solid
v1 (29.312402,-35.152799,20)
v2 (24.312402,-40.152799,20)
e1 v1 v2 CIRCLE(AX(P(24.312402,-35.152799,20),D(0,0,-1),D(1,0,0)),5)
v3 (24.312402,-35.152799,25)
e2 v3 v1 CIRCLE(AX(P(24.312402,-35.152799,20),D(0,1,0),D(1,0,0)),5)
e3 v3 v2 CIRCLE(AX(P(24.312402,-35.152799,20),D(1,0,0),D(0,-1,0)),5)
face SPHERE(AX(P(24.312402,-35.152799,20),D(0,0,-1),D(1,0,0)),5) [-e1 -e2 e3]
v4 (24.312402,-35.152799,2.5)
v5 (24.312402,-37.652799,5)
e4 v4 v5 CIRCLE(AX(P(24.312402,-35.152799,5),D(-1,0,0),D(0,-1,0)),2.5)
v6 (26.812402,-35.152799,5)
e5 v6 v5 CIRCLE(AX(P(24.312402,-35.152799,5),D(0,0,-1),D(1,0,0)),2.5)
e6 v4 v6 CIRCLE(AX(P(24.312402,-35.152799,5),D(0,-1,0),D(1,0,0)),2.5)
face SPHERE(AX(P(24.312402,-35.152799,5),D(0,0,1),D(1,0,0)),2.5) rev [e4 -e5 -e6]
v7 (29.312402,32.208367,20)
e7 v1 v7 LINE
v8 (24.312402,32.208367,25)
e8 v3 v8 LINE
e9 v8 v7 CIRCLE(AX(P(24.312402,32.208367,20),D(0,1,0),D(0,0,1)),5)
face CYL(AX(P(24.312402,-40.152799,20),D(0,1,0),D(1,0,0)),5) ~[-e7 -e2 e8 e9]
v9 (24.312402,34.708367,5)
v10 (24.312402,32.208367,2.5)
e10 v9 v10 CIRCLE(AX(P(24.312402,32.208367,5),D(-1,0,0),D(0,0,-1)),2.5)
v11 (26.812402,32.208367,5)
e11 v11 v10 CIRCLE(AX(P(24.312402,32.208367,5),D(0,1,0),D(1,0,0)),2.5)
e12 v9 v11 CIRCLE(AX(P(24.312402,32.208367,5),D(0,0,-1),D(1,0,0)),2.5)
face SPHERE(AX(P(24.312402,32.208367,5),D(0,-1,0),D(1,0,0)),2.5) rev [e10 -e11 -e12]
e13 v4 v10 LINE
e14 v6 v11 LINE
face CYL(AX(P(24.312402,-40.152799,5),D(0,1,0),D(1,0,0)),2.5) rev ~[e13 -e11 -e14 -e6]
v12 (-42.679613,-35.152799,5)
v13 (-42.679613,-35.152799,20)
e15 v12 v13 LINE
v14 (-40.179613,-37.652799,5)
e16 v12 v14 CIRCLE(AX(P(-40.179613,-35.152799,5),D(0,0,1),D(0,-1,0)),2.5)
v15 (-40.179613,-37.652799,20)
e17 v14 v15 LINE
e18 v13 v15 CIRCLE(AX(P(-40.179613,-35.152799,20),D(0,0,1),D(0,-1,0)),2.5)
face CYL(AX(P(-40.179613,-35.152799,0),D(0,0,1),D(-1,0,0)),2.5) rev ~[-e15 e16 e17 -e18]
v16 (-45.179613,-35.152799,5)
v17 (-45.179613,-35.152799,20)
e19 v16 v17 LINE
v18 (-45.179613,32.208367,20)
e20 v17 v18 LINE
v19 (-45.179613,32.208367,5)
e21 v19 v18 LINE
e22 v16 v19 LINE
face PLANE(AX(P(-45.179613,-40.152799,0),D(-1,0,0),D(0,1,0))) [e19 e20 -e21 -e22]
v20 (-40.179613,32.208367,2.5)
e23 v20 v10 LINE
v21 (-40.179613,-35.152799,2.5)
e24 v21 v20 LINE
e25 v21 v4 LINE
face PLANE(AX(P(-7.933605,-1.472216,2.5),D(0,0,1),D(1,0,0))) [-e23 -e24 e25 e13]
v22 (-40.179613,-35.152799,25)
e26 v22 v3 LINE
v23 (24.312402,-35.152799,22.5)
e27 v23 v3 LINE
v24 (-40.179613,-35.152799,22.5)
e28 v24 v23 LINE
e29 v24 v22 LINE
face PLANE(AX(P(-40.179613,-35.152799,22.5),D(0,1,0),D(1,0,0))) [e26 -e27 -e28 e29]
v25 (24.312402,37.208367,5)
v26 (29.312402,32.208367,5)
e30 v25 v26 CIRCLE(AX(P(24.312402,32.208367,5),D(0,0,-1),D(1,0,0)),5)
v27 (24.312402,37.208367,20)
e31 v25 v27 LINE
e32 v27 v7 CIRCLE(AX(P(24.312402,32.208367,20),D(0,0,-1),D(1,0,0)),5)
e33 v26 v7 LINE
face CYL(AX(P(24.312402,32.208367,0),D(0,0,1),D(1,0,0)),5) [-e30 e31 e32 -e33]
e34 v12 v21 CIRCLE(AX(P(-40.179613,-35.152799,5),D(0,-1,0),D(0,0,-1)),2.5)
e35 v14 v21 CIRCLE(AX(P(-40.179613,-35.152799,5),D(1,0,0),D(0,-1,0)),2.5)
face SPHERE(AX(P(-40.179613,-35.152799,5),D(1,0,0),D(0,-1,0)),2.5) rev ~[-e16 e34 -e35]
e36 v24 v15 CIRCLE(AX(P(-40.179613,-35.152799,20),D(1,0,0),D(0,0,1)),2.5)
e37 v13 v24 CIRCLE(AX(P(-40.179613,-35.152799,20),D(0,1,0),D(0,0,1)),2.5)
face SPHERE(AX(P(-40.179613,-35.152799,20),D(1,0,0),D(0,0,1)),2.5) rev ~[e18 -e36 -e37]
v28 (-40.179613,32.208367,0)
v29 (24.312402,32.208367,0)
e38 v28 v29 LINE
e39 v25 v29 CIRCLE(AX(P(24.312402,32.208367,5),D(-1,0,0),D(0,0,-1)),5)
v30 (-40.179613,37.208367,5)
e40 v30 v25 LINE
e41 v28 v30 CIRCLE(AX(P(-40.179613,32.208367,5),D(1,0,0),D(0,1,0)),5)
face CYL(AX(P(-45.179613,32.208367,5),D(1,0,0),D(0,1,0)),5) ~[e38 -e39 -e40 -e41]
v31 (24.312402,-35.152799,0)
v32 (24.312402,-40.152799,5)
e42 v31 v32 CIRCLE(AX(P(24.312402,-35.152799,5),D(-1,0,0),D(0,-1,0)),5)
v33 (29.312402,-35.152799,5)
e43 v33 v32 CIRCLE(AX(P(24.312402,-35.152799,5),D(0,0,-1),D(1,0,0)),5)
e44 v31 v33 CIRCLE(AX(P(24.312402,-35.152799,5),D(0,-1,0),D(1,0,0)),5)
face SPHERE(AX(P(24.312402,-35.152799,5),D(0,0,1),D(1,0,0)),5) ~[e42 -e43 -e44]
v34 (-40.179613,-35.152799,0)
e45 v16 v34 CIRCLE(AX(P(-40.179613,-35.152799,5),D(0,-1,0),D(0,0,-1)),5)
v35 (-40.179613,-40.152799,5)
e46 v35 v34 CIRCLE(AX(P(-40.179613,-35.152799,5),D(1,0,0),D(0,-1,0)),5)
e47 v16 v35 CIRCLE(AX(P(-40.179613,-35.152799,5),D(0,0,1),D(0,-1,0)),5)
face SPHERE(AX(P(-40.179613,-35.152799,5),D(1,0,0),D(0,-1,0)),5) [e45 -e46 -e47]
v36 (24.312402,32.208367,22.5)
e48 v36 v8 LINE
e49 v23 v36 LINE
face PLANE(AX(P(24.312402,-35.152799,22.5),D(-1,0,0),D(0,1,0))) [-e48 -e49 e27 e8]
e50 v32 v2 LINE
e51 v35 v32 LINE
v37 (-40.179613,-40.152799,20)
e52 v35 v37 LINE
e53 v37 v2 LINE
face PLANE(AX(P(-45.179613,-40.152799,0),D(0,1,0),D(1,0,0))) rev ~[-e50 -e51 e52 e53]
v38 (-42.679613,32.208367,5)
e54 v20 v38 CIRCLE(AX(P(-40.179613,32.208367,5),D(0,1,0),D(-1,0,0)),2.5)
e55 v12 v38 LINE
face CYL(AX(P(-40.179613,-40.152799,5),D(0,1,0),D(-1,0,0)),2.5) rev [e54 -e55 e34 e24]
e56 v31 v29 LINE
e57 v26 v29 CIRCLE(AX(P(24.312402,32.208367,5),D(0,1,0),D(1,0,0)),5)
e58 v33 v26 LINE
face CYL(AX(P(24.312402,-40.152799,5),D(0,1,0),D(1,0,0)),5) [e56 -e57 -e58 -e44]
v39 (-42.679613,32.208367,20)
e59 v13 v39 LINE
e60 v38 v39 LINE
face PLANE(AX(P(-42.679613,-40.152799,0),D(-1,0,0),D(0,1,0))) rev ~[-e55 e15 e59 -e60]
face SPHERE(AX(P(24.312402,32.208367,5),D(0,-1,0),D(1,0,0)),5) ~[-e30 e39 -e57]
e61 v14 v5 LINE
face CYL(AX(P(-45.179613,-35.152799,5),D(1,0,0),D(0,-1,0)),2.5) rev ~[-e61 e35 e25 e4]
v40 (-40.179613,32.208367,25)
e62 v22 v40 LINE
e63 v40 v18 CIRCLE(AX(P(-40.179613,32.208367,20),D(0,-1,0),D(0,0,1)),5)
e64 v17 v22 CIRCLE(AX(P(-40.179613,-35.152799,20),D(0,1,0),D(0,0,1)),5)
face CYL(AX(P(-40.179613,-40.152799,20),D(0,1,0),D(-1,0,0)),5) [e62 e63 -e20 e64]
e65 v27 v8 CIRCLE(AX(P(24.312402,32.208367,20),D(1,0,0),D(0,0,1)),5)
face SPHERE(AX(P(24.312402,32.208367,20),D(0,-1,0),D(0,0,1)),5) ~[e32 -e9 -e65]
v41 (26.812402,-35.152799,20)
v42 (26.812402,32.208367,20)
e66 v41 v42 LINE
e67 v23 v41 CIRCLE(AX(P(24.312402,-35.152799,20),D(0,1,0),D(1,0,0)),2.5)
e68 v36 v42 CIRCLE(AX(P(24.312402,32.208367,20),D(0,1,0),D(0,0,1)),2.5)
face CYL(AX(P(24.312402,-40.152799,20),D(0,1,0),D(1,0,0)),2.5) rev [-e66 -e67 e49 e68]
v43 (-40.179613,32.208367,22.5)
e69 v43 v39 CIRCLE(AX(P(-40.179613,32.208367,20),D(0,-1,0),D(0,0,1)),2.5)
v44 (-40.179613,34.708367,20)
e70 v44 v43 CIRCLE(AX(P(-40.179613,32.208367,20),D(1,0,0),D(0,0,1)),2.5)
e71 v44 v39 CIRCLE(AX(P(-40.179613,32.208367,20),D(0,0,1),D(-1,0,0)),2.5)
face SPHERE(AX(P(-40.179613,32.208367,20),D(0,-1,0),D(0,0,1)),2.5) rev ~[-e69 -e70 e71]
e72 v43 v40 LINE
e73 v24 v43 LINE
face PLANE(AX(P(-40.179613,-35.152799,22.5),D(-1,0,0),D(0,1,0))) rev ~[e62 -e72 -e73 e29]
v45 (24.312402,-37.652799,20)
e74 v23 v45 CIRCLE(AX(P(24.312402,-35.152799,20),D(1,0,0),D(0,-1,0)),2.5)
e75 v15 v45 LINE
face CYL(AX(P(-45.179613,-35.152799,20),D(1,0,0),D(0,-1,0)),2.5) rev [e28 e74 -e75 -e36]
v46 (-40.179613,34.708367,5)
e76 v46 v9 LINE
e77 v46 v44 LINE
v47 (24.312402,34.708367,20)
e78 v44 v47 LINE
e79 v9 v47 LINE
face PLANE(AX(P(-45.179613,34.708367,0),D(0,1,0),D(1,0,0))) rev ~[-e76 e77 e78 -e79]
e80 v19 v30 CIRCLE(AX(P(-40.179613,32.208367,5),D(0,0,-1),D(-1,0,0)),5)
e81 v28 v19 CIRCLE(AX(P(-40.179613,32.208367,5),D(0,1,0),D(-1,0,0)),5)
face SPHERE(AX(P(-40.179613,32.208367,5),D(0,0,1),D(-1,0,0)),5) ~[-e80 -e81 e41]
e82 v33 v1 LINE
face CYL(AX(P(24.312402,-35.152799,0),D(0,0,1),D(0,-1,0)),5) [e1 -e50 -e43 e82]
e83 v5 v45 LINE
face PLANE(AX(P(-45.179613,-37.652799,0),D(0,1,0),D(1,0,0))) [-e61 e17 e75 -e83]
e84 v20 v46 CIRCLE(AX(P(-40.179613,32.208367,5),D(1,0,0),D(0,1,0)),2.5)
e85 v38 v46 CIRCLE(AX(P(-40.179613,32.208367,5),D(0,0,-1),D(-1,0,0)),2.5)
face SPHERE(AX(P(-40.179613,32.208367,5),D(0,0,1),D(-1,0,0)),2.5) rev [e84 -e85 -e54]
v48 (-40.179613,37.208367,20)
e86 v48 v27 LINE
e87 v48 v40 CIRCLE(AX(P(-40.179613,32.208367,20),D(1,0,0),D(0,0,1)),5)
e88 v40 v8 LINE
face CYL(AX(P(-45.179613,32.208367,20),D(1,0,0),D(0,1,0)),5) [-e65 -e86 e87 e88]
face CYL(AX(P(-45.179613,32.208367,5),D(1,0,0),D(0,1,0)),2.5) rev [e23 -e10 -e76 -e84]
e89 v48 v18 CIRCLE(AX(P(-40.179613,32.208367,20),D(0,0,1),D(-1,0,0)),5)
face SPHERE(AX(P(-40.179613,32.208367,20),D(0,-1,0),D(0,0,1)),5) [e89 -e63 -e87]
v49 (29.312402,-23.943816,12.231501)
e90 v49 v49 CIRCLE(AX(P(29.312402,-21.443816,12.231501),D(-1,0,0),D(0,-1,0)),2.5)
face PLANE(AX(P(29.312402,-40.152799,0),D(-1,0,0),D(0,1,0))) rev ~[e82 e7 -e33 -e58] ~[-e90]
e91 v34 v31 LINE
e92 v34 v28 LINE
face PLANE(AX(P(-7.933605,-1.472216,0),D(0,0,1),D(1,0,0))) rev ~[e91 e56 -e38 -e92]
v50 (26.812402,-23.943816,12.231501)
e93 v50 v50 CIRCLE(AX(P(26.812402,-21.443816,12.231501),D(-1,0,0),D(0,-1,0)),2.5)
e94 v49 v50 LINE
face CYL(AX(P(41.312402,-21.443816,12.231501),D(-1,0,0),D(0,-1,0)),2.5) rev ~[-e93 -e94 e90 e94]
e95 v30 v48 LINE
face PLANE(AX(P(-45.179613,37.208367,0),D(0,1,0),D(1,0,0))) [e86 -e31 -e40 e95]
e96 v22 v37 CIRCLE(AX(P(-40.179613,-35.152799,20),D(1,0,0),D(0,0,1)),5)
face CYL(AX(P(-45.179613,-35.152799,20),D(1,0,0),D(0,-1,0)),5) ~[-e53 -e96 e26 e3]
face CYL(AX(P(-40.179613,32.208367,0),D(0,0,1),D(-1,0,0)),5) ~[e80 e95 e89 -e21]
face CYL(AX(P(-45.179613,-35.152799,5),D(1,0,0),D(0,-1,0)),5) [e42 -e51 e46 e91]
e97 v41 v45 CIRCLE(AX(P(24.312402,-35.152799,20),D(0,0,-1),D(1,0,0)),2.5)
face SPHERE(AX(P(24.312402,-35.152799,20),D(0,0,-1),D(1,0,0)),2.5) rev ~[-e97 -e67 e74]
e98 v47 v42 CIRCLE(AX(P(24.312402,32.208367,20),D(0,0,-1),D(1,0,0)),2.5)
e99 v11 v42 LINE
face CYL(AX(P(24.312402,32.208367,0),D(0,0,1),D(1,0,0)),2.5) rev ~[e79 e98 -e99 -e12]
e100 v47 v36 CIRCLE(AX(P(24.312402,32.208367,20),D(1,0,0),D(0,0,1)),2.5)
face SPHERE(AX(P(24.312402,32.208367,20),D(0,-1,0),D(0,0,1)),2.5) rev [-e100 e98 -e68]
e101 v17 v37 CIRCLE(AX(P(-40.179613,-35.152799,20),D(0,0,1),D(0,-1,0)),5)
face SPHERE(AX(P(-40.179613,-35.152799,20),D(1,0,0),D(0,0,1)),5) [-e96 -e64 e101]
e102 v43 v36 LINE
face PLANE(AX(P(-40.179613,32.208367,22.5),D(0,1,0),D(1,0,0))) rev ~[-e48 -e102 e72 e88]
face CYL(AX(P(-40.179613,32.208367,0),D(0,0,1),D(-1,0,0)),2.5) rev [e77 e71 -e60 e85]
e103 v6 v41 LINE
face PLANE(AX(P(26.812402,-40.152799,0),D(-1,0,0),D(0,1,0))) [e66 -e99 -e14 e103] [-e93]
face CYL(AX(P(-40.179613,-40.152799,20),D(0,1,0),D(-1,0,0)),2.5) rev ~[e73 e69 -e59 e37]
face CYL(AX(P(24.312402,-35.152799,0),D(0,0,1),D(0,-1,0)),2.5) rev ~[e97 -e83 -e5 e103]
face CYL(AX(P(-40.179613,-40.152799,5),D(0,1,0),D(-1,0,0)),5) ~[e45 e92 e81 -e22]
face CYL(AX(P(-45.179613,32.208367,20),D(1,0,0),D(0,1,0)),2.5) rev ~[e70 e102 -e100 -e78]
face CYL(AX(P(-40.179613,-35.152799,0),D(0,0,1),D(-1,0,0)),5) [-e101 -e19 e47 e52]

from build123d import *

# Parameters (mm, degrees)
F0_W     = 74.4920149446
F0_H     = 77.3611664772
F1_DEPTH = 25
F2_R     = 5
F3_T     = -2.5
F5_D     = 5
F5_DEPTH = 12
F5_TIP   = 1.5021515476


# Not quite as in the source:
# - a shell that OpenCascade refuses in one call is made with other operations: the cavity is built on its own and cut out


with BuildPart() as f1:
    # F0 (on Top) → F1 (new body)
    with BuildSketch(Plane.XY):
        with Locations((-7.9336054623, -1.4722160995)):
            Rectangle(F0_W, F0_H)
    extrude(amount=F1_DEPTH)

    # F2
    f2_edges = [f1.edges().sort_by_distance(p)[0] for p in [
        (29.312402, -40.152799, 12.5),
        (29.312402, -1.472216, 25),
        (-7.933605, -40.152799, 25),
        (-45.179613, -1.472216, 25),
        (-7.933605, 37.208367, 25),
        (29.312402, -1.472216, 0),
        (-7.933605, -40.152799, 0),
        (29.312402, 37.208367, 12.5),
        (-45.179613, -40.152799, 12.5),
        (-45.179613, 37.208367, 12.5),
        (-45.179613, -1.472216, 0),
        (-7.933605, 37.208367, 0),
    ]]
    fillet(f2_edges, radius=F2_R)

    # F3: a shell. OpenCascade refuses it in one call, so the cavity is built on its own and cut out:
    # the body offset inwards by the wall thickness, plus a prism from it out through each open face.
    f3_core = offset(f1.part, amount=F3_T, mode=Mode.PRIVATE)
    f3_exits = [f3_core.faces().sort_by_distance(p)[0] for p in [
        (-7.933605, -1.472216, 22.5),
    ]]
    add(f3_core, mode=Mode.SUBTRACT)
    extrude(f3_exits, amount=-F3_T, mode=Mode.SUBTRACT)

    # F5
    with Locations(Plane.YZ.offset(29.31240201)):
        with Locations((-21.4438159019, 12.2315008193)):
            Hole(F5_D / 2, depth=F5_DEPTH)
            with Locations((0, 0, -(F5_DEPTH + F5_TIP / 2))):  # 118° drill point
                Cone(0, F5_D / 2, F5_TIP, mode=Mode.SUBTRACT)


solid = f1.part
